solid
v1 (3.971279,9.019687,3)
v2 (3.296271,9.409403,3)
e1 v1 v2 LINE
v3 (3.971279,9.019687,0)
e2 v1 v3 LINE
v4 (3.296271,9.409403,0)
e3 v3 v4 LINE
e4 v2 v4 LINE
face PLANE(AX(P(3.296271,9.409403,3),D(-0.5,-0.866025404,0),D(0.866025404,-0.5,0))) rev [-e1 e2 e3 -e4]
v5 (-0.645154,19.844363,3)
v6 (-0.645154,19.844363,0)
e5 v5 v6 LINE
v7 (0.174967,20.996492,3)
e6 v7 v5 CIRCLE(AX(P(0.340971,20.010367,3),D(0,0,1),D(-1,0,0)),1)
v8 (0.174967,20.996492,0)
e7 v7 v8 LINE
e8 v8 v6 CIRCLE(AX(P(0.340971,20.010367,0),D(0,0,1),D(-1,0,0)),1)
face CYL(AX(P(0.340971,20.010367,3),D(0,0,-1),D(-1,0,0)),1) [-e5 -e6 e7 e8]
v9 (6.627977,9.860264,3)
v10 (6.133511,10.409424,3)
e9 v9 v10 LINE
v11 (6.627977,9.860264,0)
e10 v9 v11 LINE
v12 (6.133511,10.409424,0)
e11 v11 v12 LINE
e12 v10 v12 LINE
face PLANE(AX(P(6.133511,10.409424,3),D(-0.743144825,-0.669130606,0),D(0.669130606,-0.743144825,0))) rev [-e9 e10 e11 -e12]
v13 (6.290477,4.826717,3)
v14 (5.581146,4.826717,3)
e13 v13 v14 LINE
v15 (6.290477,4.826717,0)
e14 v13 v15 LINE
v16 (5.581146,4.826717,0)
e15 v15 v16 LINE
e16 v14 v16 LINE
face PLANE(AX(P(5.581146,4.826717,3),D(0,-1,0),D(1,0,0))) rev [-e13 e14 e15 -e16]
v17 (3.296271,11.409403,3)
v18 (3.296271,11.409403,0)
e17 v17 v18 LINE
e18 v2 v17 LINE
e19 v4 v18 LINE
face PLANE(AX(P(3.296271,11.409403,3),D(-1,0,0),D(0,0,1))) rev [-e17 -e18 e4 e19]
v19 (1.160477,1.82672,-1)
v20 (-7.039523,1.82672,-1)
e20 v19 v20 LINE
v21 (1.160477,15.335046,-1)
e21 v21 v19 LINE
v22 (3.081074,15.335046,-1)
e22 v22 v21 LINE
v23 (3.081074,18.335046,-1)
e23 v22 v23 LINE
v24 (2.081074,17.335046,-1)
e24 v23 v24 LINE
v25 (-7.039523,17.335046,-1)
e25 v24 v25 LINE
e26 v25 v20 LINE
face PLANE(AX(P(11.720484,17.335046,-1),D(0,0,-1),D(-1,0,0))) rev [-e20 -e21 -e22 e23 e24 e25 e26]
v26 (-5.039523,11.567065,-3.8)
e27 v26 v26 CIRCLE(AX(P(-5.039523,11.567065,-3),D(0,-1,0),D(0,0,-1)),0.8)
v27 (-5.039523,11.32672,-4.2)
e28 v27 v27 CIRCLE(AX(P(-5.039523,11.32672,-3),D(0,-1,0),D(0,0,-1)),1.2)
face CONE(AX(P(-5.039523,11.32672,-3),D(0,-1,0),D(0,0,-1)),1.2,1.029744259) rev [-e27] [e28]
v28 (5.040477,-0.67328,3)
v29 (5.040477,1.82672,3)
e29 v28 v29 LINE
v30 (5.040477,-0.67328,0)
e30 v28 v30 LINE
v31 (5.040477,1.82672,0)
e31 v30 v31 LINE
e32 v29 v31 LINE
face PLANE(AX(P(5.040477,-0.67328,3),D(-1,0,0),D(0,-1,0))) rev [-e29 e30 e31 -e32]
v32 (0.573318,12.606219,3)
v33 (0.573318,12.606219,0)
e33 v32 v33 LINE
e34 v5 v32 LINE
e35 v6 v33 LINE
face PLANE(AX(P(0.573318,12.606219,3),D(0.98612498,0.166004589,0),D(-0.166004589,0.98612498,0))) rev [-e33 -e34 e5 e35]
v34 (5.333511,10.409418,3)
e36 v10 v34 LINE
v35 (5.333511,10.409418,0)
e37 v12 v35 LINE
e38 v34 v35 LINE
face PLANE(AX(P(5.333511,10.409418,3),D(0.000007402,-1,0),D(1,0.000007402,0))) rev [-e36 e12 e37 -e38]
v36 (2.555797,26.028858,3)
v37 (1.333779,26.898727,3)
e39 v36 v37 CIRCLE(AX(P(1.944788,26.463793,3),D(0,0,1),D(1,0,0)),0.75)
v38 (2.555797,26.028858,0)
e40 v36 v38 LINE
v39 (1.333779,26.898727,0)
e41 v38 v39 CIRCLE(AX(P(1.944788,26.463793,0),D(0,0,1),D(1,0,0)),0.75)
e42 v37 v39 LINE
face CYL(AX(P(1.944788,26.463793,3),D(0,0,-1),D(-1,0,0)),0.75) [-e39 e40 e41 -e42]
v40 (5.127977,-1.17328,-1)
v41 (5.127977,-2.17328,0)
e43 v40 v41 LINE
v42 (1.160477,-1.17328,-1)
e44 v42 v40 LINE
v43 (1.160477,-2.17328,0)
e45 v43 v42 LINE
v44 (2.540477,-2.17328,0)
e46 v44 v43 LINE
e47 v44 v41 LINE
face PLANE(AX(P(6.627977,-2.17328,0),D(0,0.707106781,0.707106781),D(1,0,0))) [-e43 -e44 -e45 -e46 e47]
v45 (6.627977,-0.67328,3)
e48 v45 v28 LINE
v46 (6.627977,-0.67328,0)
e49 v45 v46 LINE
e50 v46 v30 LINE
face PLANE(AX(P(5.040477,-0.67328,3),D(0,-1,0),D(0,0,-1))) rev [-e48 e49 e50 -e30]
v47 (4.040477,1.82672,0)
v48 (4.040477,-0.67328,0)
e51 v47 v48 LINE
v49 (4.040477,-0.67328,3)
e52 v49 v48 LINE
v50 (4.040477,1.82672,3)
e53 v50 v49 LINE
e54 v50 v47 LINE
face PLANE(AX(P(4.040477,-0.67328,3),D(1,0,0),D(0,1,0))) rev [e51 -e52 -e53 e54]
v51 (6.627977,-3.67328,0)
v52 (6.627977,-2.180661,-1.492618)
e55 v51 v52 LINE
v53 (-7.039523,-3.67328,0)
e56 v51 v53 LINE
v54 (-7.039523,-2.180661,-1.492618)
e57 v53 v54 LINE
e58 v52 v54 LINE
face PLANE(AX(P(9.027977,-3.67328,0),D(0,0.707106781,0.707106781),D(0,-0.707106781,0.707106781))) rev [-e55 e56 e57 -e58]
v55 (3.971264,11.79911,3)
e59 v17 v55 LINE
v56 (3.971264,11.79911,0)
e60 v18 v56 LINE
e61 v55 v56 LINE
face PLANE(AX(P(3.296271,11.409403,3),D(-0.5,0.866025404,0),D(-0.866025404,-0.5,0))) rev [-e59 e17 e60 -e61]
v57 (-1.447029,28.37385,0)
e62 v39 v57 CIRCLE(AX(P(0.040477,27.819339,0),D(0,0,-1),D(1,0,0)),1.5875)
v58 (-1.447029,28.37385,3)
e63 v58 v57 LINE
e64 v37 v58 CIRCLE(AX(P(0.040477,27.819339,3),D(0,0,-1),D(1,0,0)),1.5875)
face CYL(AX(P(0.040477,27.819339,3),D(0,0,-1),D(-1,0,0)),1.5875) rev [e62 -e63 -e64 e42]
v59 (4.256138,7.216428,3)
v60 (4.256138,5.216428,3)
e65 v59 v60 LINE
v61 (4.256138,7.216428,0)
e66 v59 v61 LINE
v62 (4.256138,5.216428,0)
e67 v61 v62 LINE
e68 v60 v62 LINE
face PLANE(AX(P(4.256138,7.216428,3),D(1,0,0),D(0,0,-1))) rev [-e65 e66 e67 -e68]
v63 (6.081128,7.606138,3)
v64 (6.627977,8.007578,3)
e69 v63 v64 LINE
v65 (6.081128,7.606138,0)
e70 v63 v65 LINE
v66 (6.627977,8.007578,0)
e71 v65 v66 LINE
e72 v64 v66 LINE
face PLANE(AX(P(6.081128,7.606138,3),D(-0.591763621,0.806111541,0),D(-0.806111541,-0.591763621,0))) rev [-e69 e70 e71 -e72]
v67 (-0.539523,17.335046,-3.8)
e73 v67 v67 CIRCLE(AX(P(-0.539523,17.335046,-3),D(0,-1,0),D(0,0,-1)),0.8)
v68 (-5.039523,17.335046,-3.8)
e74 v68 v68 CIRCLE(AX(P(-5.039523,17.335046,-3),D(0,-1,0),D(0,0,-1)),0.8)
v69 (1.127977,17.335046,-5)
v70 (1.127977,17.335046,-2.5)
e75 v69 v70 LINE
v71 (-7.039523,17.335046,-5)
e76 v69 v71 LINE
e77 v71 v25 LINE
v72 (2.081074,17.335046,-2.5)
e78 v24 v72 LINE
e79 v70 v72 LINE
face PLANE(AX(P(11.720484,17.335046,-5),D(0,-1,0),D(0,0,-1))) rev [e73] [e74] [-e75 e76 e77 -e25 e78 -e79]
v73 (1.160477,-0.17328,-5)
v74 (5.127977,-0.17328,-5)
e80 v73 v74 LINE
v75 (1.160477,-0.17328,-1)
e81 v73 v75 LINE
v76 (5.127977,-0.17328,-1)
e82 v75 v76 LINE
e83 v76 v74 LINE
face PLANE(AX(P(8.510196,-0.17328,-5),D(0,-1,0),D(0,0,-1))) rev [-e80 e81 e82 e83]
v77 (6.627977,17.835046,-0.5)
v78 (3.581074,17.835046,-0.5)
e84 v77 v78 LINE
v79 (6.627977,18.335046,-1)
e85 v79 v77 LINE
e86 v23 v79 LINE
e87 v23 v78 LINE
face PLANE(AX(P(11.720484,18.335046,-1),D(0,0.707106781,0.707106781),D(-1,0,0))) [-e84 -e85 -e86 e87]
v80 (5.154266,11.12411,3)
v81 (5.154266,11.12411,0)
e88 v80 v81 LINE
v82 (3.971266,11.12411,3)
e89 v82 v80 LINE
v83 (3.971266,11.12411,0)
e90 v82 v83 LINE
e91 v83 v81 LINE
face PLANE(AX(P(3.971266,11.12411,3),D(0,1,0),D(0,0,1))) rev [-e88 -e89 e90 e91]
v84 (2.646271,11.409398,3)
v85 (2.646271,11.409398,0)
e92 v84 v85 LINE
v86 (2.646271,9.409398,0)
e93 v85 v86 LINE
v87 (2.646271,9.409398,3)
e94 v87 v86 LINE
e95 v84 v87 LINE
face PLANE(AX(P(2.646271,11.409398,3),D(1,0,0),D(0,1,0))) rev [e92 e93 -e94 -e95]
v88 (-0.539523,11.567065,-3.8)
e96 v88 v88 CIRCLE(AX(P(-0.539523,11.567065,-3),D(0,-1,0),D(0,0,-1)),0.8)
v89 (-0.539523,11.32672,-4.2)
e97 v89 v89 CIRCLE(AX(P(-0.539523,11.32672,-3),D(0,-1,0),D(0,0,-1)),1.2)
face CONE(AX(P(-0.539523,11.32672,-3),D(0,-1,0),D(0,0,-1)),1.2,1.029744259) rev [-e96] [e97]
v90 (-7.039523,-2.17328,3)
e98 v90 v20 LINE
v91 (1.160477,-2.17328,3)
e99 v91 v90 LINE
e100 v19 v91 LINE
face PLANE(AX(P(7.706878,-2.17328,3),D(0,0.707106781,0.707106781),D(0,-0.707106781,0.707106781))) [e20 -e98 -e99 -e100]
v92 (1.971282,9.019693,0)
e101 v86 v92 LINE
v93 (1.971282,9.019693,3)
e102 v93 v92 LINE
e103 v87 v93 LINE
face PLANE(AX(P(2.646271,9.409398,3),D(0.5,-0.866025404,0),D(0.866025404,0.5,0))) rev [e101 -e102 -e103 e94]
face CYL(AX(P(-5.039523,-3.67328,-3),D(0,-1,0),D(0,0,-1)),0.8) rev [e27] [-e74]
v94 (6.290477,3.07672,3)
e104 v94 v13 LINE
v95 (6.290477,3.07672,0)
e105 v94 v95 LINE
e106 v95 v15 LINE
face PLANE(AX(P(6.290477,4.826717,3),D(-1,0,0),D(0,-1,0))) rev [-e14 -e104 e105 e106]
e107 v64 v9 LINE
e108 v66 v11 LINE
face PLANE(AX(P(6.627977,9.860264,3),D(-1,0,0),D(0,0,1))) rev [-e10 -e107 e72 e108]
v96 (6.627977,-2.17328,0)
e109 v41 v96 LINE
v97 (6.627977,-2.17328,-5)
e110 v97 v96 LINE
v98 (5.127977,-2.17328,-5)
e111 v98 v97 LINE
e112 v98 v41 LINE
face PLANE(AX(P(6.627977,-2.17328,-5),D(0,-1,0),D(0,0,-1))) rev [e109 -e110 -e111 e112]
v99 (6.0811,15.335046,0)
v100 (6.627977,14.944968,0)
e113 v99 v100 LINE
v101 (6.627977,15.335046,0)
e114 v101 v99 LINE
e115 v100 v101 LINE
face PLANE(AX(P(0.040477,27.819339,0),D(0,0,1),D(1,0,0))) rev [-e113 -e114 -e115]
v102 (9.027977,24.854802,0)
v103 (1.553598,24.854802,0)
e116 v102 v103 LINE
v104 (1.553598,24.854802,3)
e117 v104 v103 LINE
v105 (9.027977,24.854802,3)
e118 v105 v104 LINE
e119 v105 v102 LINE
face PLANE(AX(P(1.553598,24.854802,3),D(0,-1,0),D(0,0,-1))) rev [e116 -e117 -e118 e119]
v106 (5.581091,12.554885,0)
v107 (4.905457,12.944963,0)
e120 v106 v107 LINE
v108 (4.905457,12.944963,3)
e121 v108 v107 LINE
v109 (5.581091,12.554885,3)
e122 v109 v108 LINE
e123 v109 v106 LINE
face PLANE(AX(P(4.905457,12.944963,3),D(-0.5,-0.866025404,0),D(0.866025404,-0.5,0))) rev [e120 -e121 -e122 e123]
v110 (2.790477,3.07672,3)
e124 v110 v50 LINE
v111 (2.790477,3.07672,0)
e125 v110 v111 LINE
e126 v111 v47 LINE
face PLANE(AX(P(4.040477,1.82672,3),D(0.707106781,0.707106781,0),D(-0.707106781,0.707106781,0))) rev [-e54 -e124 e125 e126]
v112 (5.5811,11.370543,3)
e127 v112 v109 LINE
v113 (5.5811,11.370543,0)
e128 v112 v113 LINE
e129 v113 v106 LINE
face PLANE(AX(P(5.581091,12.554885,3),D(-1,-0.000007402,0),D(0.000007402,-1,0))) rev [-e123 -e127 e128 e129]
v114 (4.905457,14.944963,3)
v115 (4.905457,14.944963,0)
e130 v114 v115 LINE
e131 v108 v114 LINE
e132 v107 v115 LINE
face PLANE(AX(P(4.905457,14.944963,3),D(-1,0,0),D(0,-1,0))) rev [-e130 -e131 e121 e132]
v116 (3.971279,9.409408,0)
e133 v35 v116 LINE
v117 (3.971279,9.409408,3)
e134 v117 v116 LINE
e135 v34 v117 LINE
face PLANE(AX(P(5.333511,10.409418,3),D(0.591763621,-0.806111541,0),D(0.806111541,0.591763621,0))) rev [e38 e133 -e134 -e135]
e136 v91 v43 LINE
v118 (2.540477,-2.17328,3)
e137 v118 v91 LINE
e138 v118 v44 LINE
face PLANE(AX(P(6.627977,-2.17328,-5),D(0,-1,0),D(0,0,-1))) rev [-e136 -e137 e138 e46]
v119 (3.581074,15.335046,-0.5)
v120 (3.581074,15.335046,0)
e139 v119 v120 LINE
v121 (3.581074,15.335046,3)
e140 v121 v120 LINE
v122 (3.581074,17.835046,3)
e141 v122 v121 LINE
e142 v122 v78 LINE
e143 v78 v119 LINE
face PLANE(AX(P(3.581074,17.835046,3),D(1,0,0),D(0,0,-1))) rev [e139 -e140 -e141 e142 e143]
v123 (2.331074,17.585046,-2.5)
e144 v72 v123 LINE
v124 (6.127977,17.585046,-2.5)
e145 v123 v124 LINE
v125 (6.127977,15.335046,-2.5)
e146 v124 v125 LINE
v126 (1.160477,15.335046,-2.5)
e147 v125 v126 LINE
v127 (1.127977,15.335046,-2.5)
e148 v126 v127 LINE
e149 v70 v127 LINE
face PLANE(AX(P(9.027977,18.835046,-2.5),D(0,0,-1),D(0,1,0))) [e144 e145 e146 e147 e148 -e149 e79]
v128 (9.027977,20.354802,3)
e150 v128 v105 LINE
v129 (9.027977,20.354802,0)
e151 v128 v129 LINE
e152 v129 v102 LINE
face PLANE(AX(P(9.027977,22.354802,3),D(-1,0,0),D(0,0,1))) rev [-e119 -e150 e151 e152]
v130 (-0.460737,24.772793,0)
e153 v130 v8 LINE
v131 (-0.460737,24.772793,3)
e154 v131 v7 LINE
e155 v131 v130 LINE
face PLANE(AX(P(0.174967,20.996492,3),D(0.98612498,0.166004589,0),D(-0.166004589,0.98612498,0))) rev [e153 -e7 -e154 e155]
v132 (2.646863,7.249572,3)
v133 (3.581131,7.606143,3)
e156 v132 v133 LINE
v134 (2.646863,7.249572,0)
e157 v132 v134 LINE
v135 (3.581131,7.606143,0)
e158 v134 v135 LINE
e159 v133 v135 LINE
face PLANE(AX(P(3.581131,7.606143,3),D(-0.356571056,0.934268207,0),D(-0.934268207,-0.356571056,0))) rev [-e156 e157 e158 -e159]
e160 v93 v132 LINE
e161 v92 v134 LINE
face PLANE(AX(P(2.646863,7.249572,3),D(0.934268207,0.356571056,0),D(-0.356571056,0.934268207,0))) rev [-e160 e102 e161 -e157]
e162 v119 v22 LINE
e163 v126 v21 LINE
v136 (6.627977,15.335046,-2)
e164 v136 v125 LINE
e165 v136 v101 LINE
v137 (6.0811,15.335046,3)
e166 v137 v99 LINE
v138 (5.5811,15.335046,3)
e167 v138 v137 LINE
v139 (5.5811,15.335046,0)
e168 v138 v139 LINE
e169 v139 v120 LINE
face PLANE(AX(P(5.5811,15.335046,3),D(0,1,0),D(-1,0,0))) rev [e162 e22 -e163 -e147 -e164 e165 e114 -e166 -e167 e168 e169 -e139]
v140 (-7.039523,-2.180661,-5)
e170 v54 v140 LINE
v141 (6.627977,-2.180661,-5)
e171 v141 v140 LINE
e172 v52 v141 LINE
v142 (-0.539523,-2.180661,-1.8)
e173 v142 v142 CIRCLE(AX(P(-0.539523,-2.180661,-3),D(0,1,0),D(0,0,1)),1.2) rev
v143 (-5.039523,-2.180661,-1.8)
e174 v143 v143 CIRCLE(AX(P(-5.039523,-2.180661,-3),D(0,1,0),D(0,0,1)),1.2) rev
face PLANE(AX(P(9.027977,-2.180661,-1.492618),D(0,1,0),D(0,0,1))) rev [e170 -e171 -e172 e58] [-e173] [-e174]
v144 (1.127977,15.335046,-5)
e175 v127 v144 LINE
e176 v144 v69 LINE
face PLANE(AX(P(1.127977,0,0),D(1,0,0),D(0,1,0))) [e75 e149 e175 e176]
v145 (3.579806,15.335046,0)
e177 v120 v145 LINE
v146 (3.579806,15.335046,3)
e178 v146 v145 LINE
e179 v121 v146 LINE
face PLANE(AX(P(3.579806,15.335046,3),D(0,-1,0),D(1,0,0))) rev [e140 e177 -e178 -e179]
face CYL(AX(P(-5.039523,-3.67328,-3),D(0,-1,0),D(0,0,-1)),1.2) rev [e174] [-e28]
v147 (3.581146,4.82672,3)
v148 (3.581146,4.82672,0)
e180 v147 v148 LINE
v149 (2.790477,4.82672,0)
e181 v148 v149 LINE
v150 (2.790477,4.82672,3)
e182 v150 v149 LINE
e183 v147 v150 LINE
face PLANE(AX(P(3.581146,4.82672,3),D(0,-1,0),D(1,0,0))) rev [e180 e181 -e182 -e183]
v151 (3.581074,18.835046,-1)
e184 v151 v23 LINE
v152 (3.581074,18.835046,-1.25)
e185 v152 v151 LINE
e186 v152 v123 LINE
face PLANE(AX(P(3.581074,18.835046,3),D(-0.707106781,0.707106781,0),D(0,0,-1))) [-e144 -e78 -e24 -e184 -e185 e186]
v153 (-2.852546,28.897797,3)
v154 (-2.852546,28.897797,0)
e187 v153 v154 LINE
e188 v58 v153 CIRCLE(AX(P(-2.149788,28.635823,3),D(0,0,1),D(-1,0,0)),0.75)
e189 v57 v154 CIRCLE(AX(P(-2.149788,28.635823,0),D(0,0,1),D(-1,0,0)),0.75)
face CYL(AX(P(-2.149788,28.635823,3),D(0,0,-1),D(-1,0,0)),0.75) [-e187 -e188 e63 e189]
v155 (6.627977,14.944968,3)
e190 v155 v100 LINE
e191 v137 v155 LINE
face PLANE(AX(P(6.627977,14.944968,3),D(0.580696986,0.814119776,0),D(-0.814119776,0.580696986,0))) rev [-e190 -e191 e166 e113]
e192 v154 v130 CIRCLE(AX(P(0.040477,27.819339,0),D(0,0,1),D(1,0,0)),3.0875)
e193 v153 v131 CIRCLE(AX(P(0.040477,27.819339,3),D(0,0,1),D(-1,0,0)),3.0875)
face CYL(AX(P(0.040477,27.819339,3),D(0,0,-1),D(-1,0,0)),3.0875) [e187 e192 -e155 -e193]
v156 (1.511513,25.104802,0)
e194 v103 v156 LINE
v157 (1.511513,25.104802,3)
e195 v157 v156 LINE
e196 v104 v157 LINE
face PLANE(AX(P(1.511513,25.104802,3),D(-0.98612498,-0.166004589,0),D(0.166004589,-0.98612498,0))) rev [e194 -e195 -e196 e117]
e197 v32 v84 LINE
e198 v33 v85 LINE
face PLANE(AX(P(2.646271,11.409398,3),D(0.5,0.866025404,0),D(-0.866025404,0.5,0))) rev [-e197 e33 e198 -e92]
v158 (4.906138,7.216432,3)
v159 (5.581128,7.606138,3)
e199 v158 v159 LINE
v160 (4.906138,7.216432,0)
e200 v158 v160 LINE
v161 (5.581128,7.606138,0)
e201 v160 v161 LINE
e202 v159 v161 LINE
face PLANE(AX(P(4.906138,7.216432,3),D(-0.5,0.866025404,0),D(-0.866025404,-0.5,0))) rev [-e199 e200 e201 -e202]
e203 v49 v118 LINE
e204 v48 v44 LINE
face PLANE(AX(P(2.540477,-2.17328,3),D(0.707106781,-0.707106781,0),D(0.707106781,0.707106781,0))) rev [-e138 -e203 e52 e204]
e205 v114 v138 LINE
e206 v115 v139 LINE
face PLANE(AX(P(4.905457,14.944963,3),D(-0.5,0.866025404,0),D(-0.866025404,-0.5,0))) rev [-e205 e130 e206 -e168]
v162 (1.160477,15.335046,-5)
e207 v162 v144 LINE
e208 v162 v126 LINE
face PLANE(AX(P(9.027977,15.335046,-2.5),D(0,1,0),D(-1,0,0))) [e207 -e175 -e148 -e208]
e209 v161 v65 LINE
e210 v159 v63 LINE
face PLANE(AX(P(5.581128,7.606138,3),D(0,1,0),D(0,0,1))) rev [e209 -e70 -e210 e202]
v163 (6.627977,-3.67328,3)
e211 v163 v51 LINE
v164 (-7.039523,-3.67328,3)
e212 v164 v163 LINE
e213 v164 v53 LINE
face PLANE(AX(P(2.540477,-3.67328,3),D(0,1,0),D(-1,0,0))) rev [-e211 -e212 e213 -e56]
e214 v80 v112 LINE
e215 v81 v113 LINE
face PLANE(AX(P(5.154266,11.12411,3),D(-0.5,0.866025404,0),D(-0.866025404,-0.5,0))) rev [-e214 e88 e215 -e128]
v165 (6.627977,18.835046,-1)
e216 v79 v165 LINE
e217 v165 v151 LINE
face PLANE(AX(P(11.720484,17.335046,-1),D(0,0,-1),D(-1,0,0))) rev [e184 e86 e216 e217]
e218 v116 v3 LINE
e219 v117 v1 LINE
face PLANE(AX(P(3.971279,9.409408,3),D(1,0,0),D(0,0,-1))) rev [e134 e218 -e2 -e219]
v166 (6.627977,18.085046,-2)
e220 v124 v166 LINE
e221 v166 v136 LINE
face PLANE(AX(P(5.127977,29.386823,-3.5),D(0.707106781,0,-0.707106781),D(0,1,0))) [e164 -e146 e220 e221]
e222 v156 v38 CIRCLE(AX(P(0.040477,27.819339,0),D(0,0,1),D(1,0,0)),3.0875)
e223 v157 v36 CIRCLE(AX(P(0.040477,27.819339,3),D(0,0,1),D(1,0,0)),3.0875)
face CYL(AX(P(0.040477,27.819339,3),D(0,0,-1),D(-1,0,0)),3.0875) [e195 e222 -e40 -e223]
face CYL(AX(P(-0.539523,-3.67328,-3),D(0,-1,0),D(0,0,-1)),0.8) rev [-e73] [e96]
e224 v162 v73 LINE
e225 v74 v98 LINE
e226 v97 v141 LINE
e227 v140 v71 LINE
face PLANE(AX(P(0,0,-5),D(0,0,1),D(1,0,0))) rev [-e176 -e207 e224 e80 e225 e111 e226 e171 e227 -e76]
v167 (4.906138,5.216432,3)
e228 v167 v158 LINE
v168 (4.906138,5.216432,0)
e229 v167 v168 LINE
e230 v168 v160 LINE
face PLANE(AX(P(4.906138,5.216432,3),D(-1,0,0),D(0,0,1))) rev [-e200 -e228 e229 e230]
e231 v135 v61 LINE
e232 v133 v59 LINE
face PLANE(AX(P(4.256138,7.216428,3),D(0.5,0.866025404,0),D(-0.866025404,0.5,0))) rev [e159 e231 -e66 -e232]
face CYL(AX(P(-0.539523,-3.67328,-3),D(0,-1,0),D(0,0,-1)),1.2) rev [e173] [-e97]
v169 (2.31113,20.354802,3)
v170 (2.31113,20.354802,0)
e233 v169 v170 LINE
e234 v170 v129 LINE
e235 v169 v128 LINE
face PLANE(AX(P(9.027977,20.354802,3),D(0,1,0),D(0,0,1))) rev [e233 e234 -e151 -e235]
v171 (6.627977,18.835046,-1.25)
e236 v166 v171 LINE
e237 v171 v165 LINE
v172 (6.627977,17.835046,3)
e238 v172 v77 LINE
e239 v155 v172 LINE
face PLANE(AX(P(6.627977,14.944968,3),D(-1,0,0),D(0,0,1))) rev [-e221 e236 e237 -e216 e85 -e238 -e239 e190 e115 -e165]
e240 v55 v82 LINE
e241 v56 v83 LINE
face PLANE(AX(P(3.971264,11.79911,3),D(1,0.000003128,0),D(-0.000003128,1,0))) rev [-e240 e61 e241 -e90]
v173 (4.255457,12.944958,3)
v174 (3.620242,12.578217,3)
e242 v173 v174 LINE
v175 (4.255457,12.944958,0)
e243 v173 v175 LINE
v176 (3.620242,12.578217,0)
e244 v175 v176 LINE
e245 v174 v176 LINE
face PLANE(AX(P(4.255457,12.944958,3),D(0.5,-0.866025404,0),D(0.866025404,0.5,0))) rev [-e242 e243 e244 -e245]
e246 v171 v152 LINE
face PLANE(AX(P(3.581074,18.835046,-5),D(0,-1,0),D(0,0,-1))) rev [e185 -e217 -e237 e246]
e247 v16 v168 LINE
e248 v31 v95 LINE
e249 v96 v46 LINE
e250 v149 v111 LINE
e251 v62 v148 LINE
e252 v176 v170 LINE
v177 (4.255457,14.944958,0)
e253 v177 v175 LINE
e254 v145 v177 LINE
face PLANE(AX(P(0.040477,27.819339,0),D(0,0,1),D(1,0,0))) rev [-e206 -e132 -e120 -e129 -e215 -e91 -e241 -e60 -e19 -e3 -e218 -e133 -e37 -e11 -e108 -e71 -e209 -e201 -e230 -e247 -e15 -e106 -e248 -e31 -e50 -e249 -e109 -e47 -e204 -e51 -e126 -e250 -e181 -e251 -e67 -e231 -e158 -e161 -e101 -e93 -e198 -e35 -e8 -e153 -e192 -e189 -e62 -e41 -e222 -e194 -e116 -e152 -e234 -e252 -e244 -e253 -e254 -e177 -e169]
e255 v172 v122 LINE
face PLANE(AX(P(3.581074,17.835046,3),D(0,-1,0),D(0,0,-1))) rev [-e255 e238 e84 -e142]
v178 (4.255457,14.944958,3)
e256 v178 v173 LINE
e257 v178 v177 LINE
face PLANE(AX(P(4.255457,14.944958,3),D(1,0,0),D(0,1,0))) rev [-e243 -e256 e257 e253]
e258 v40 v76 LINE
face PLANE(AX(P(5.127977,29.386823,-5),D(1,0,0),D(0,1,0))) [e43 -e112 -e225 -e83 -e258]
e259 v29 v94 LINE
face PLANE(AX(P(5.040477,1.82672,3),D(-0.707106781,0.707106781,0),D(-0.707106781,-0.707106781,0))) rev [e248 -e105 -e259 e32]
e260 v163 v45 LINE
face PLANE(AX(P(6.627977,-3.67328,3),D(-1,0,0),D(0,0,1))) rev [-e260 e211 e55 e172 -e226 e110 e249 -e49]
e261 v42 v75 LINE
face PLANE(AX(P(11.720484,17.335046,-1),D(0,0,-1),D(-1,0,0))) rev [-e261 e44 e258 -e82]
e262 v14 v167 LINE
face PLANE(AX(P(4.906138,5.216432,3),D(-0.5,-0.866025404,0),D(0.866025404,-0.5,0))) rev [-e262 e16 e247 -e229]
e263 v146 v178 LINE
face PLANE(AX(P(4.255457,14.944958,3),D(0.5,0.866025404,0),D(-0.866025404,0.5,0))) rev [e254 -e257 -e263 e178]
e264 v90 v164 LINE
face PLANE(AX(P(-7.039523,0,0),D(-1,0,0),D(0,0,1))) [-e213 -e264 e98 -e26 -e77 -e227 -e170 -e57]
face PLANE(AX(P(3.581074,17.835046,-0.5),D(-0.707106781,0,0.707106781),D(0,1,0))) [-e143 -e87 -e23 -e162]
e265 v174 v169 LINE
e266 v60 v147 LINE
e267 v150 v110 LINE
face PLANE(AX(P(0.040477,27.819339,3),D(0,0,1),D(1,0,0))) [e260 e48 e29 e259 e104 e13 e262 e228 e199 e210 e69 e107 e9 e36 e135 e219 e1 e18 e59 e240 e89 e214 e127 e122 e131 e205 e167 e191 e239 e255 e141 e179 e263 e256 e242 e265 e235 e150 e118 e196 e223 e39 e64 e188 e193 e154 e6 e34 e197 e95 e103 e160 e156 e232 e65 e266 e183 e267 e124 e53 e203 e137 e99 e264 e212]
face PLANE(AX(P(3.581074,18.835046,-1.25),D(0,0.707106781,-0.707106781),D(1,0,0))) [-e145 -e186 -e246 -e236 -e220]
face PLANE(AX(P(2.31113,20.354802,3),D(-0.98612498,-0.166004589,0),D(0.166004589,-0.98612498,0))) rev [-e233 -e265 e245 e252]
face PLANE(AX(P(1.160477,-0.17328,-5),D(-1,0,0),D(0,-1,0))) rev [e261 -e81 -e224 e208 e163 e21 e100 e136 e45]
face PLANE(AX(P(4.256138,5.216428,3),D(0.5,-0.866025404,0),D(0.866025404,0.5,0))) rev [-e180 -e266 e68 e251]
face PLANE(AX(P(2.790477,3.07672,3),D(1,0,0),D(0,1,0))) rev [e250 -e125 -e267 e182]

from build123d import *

# Parameters (mm, degrees)
BOSS_SWITCH_BODY_DEPTH                    = 3
SKETCH1_W                                 = 4.0875
SKETCH1_H                                 = 1.5
SKETCH1_W_2                               = 3.046903414
SKETCH1_H_2                               = 3.5
BOSS_FLANGE_WIDTH_DEPTH                   = 5
SKETCH2_W                                 = 4
SKETCH2_H                                 = 2
SKETCH2_W_2                               = 8
SKETCH2_H_2                               = 1.5
BOSS_FLANGE_HEIGHT_DEPTH                  = 10.620596586
CUT_UP_TO_DOWN_DERAILLEUR_CLEARANCE_REACH = 23.629
SKETCH10_W                                = 1.5
SKETCH10_H                                = 3
SKETCH17_W                                = 12.1675
SKETCH17_H                                = 4
BOSS_FLANGE_SUPPORT_DEPTH                 = 17.508325141
TAP_DRILL_FOR_M2X0_4_TAP1_D               = 1.6
M2_CLEARANCE_HOLE2_D                      = 2.4
M2_CLEARANCE_HOLE2_DEPTH                  = 15
M2_CLEARANCE_HOLE2_TIP                    = 0.721032743
CHAMFER_FLANGE_SUPPORT_SIZE               = 1.5
CHAMFER_FLANGE_SUPPORT_2_SIZE             = 1.5
SKETCH23_W                                = 7.349718646
SKETCH23_H                                = 15.508325141
CUT_GAP_FOR_PRINTING_DEPTH                = 32.000499688
CUT_WIDE_DERAILLEUR_CLEARANCE_DEPTH       = 33.195879702
CUT_WIDE_DERAILLEUR_CLEARANCE_DEPTH_BACK  = 4
SKETCH27_W                                = 2.5
SKETCH27_H                                = 3.5
CHAMFER9_SIZE                             = 1.25
SKETCH28_W                                = 3.046903414
SKETCH28_H                                = 1
CUT_EXTRUDE1_DEPTH                        = 1
CHAMFER10_SIZE                            = 0.5
CHAMFER_FLANGE_SUPPORT_3_SIZE             = 1
CUT_EXTRUDE2_DEPTH                        = 34.862828732
BOSS_EXTRUDE2_DEPTH                       = 8.2


with BuildPart() as part:
    # Sketch-SwitchBossUp → Boss-Switch Body (new body)
    with BuildSketch(Plane.XY):
        with BuildLine():
            Line((5.581091204, 12.554885442), (5.58109997, 11.370542897))
            Line((5.58109997, 11.370542897), (5.154266051, 11.12411022))
            Line((5.154266051, 11.12411022), (3.971266051, 11.12411022))
            Line((3.971266051, 11.12411022), (3.97126394, 11.79911022))
            Line((3.97126394, 11.79911022), (3.296271341, 11.409403061))
            Line((3.296271341, 11.409403061), (3.296271341, 9.409403061))
            Line((3.296271341, 9.409403061), (3.971278743, 9.019687356))
            Line((3.971278743, 9.019687356), (3.971278743, 9.409408058))
            Line((3.971278743, 9.409408058), (5.333511297, 10.40941814))
            Line((5.333511297, 10.40941814), (6.133511297, 10.409424062))
            Line((6.133511297, 10.409424062), (6.627976927, 9.860264345))
            Line((6.627976927, 9.860264345), (6.627976927, 8.007577878))
            Line((6.627976927, 8.007577878), (6.081127833, 7.606137899))
            Line((6.081127833, 7.606137899), (5.581127833, 7.606137899))
            Line((5.581127833, 7.606137899), (4.906138119, 7.216432406))
            Line((4.906138119, 7.216432406), (4.906138119, 5.216432406))
            Line((4.906138119, 5.216432406), (5.58114552, 4.826716701))
            Line((5.58114552, 4.826716701), (6.290476927, 4.826716701))
            Line((6.290476927, 4.826716701), (6.290476927, 3.076720436))
            Line((6.290476927, 3.076720436), (5.040476927, 1.826720436))
            Line((5.040476927, 1.826720436), (5.040476927, -0.673279564))
            Line((5.040476927, -0.673279564), (6.627976927, -0.673279564))
            Line((6.627976927, -0.673279564), (6.627976927, -3.673279564))
            Line((6.627976927, -3.673279564), (2.540476927, -3.673279564))
            Line((2.540476927, -3.673279564), (2.540476927, -2.173279564))
            Line((2.540476927, -2.173279564), (4.040476927, -0.673279564))
            Line((4.040476927, -0.673279564), (4.040476927, 1.826720436))
            Line((4.040476927, 1.826720436), (2.790476927, 3.076720436))
            Line((2.790476927, 3.076720436), (2.790476927, 4.826720436))
            Line((2.790476927, 4.826720436), (3.58114552, 4.826720436))
            Line((3.58114552, 4.826720436), (4.256138119, 5.216427595))
            Line((4.256138119, 5.216427595), (4.256138119, 7.216427595))
            Line((4.256138119, 7.216427595), (3.581130717, 7.6061433))
            Line((3.581130717, 7.6061433), (2.64686251, 7.249572244))
            Line((2.64686251, 7.249572244), (1.971281627, 9.019692757))
            Line((1.971281627, 9.019692757), (2.646271341, 9.40939825))
            Line((2.646271341, 9.40939825), (2.646271341, 11.40939825))
            Line((2.646271341, 11.40939825), (1.696557212, 11.957715958))
            Line((1.696557212, 11.957715958), (0.573317845, 12.60621851))
            Line((0.573317845, 12.60621851), (-0.645153605, 19.844362607))
            ThreePointArc((-0.645153605, 19.844362607), (-0.473707256, 20.590279886), (0.174966786, 20.996492176))
            Line((0.174966786, 20.996492176), (-0.46073685, 24.772792819))
            ThreePointArc((-0.46073685, 24.772792819), (-1.019582136, 24.919522879), (-1.541303694, 25.167805745))
            ThreePointArc((-1.541303694, 25.167805745), (-2.872284003, 26.795385437), (-2.852546321, 28.897797067))
            ThreePointArc((-2.852546321, 28.897797067), (-1.887813913, 29.338582026), (-1.447028953, 28.373849618))
            ThreePointArc((-1.447028953, 28.373849618), (-0.703448682, 26.416936722), (1.333779254, 26.898727173))
            ThreePointArc((1.333779254, 26.898727173), (2.379722745, 27.074801628), (2.555797201, 26.028858137))
            ThreePointArc((2.555797201, 26.028858137), (2.086504637, 25.507104397), (1.511513111, 25.104801997))
            Line((1.511513111, 25.104801997), (1.553598189, 24.854801997))
            Line((1.553598189, 24.854801997), (9.027976927, 24.854801997))
            Line((9.027976927, 24.854801997), (9.027976927, 22.354801997))
            Line((9.027976927, 22.354801997), (9.027976927, 20.354801997))
            Line((9.027976927, 20.354801997), (2.311129602, 20.354801997))
            Line((2.311129602, 20.354801997), (3.620242387, 12.578216848))
            Line((3.620242387, 12.578216848), (4.255457038, 12.944958198))
            Line((4.255457038, 12.944958198), (4.255457038, 14.944958198))
            Line((4.255457038, 14.944958198), (3.579805878, 15.335045577))
            Line((3.579805878, 15.335045577), (3.581073513, 15.335045577))
            Line((3.581073513, 15.335045577), (3.581073513, 17.835045577))
            Line((3.581073513, 17.835045577), (5.725580434, 17.835045577))
            Line((5.725580434, 17.835045577), (6.627976927, 17.835045577))
            Line((6.627976927, 17.835045577), (6.627976927, 14.94496801))
            Line((6.627976927, 14.94496801), (6.081099865, 15.335045577))
            Line((6.081099865, 15.335045577), (5.581099865, 15.335045577))
            Line((5.581099865, 15.335045577), (4.905457038, 14.944963009))
            Line((4.905457038, 14.944963009), (4.905457038, 12.944963009))
            Line((4.905457038, 12.944963009), (5.581091204, 12.554885442))
        make_face()
    extrude(amount=BOSS_SWITCH_BODY_DEPTH)

    # Sketch1 → Boss-Flange Width (add)
    with BuildSketch(Plane(origin=(0, 0, 0), x_dir=(-1, 0, 0), z_dir=(0, 0, -1))):
        with Locations((-4.584226927, -2.923279564)):
            Rectangle(SKETCH1_W, SKETCH1_H)
        with Locations((-5.10452522, 17.085045577)):
            Rectangle(SKETCH1_W_2, SKETCH1_H_2)
    extrude(amount=BOSS_FLANGE_WIDTH_DEPTH)

    # Sketch2 → Boss-Flange Height (add)
    with BuildSketch(Plane(origin=(-7.039523073, 0, 0), x_dir=(0, 0, -1), z_dir=(1, 0, 0))):
        with Locations((3, 16.335045577)):
            Rectangle(SKETCH2_W, SKETCH2_H)
        with Locations((1, -2.923279564)):
            Rectangle(SKETCH2_W_2, SKETCH2_H_2)
    extrude(amount=BOSS_FLANGE_HEIGHT_DEPTH)

    # Sketch10 → Cut-Up-To-Down Derailleur Clearance (cut, up to next)
    with BuildSketch(Plane(origin=(0, 15.335045577, 0), x_dir=(1, 0, 0), z_dir=(0, 1, 0)), mode=Mode.PRIVATE) as cut_up_to_down_derailleur_clearance_sk1:
        with Locations((5.877976927, 3.5)):
            Rectangle(SKETCH10_W, SKETCH10_H)
    cut_up_to_down_derailleur_clearance_tool1 = extrude(cut_up_to_down_derailleur_clearance_sk1.sketch, amount=CUT_UP_TO_DOWN_DERAILLEUR_CLEARANCE_REACH, mode=Mode.PRIVATE) & part.part
    add(cut_up_to_down_derailleur_clearance_tool1.solids().sort_by_distance((5.877977, 15.335046, -3.5))[0], mode=Mode.SUBTRACT)

    # Sketch17 → Boss-Flange Support (add)
    with BuildSketch(Plane.XZ.offset(-15.335045577)):
        with Locations((-0.955773073, -3)):
            Rectangle(SKETCH17_W, SKETCH17_H)
    extrude(amount=BOSS_FLANGE_SUPPORT_DEPTH)

    # Tap Drill for M2x0.4 Tap1 (through all)
    with Locations(Plane(origin=(0, -3.673279564, 0), x_dir=(-1, 0, 0), z_dir=(0, -1, 0))):
        with Locations((5.039523073, 3), (0.539523073, 3)):
            Hole(TAP_DRILL_FOR_M2X0_4_TAP1_D / 2)

    # M2 Clearance Hole2
    with Locations(Plane.XZ.offset(3.673279564)):
        with Locations((-5.039523073, -3), (-0.539523073, -3)):
            Hole(M2_CLEARANCE_HOLE2_D / 2, depth=M2_CLEARANCE_HOLE2_DEPTH)
            with Locations((0, 0, -(M2_CLEARANCE_HOLE2_DEPTH + M2_CLEARANCE_HOLE2_TIP / 2))):  # 118° drill point
                Cone(0, M2_CLEARANCE_HOLE2_D / 2, M2_CLEARANCE_HOLE2_TIP, mode=Mode.SUBTRACT)

    # Chamfer-Flange Support
    chamfer_flange_support_edges = [part.edges().sort_by_distance(p)[0] for p in [
        (3.581073513, 17.335045577, -3),
    ]]
    chamfer(chamfer_flange_support_edges, length=CHAMFER_FLANGE_SUPPORT_SIZE - 0.0001)  # a hair under: the kernel refuses the full size

    # Chamfer-Flange Support 2
    chamfer_flange_support_2_edges = [part.edges().sort_by_distance(p)[0] for p in [
        (5.127976927, 17.085045577, -2),
        (5.127976927, 15.335045577, -1.5),
    ]]
    chamfer(chamfer_flange_support_2_edges, length=CHAMFER_FLANGE_SUPPORT_2_SIZE - 0.0001)  # a hair under: the kernel refuses the full size

    # Sketch23 → Cut-Gap for Printing (cut, through all)
    with BuildSketch(Plane.XY.offset(-1)):
        with Locations((4.83533625, 7.580883007)):
            Rectangle(SKETCH23_W, SKETCH23_H)
    extrude(amount=-CUT_GAP_FOR_PRINTING_DEPTH, mode=Mode.SUBTRACT)

    # Sketch27 → Cut-Wide Derailleur Clearance (cut, two sides: drawn at the far end of the back side and taken through both)
    with BuildSketch(Plane(origin=(5.127976927, 0, 0), x_dir=(0, 0, -1), z_dir=(1, 0, 0)).offset(-CUT_WIDE_DERAILLEUR_CLEARANCE_DEPTH_BACK)):
        with Locations((3.75, 17.085045577)):
            Rectangle(SKETCH27_W, SKETCH27_H)
    extrude(amount=CUT_WIDE_DERAILLEUR_CLEARANCE_DEPTH + CUT_WIDE_DERAILLEUR_CLEARANCE_DEPTH_BACK, mode=Mode.SUBTRACT)

    # Chamfer9
    chamfer9_edges = [part.edges().sort_by_distance(p)[0] for p in [
        (4.85447522, 18.835045577, -2.5),
    ]]
    chamfer(chamfer9_edges, length=CHAMFER9_SIZE)

    # Sketch28 → Cut-Extrude1 (cut)
    with BuildSketch(Plane.XY.offset(-1)):
        with Locations((5.10452522, 18.335045577)):
            Rectangle(SKETCH28_W, SKETCH28_H)
    extrude(amount=CUT_EXTRUDE1_DEPTH, mode=Mode.SUBTRACT)

    # Chamfer10
    chamfer10_edges = [part.edges().sort_by_distance(p)[0] for p in [
        (3.581073513, 16.335045577, -1),
        (5.10452522, 17.835045577, -1),
    ]]
    chamfer(chamfer10_edges, length=CHAMFER10_SIZE - 0.0001)  # a hair under: the kernel refuses the full size

    # Chamfer-Flange Support 3
    chamfer_flange_support_3_edges = [part.edges().sort_by_distance(p)[0] for p in [
        (-0.955773073, -2.173279564, -1),
    ]]
    chamfer(chamfer_flange_support_3_edges, length=CHAMFER_FLANGE_SUPPORT_3_SIZE - 0.0001)  # a hair under: the kernel refuses the full size

    # Sketch31 → Cut-Extrude2 (cut, through all)
    with BuildSketch(Plane.ZY.offset(7.039523073)):
        Polygon((-5, -2.180661432), (-5, -3.673279564), (0, -3.673279564), (-1.492618132, -2.180661432), align=None)
    extrude(amount=-CUT_EXTRUDE2_DEPTH, mode=Mode.SUBTRACT)

    # Sketch32 → Boss-Extrude2 (add)
    with BuildSketch(Plane.ZY.offset(7.039523073)):
        Polygon((3, -2.173279564), (-1, 1.826720436), (-1, -2.082793031), (0.406297605, -3.355496176), (3, -3.355496176), align=None)
    extrude(amount=-BOSS_EXTRUDE2_DEPTH)


solid = part.part
